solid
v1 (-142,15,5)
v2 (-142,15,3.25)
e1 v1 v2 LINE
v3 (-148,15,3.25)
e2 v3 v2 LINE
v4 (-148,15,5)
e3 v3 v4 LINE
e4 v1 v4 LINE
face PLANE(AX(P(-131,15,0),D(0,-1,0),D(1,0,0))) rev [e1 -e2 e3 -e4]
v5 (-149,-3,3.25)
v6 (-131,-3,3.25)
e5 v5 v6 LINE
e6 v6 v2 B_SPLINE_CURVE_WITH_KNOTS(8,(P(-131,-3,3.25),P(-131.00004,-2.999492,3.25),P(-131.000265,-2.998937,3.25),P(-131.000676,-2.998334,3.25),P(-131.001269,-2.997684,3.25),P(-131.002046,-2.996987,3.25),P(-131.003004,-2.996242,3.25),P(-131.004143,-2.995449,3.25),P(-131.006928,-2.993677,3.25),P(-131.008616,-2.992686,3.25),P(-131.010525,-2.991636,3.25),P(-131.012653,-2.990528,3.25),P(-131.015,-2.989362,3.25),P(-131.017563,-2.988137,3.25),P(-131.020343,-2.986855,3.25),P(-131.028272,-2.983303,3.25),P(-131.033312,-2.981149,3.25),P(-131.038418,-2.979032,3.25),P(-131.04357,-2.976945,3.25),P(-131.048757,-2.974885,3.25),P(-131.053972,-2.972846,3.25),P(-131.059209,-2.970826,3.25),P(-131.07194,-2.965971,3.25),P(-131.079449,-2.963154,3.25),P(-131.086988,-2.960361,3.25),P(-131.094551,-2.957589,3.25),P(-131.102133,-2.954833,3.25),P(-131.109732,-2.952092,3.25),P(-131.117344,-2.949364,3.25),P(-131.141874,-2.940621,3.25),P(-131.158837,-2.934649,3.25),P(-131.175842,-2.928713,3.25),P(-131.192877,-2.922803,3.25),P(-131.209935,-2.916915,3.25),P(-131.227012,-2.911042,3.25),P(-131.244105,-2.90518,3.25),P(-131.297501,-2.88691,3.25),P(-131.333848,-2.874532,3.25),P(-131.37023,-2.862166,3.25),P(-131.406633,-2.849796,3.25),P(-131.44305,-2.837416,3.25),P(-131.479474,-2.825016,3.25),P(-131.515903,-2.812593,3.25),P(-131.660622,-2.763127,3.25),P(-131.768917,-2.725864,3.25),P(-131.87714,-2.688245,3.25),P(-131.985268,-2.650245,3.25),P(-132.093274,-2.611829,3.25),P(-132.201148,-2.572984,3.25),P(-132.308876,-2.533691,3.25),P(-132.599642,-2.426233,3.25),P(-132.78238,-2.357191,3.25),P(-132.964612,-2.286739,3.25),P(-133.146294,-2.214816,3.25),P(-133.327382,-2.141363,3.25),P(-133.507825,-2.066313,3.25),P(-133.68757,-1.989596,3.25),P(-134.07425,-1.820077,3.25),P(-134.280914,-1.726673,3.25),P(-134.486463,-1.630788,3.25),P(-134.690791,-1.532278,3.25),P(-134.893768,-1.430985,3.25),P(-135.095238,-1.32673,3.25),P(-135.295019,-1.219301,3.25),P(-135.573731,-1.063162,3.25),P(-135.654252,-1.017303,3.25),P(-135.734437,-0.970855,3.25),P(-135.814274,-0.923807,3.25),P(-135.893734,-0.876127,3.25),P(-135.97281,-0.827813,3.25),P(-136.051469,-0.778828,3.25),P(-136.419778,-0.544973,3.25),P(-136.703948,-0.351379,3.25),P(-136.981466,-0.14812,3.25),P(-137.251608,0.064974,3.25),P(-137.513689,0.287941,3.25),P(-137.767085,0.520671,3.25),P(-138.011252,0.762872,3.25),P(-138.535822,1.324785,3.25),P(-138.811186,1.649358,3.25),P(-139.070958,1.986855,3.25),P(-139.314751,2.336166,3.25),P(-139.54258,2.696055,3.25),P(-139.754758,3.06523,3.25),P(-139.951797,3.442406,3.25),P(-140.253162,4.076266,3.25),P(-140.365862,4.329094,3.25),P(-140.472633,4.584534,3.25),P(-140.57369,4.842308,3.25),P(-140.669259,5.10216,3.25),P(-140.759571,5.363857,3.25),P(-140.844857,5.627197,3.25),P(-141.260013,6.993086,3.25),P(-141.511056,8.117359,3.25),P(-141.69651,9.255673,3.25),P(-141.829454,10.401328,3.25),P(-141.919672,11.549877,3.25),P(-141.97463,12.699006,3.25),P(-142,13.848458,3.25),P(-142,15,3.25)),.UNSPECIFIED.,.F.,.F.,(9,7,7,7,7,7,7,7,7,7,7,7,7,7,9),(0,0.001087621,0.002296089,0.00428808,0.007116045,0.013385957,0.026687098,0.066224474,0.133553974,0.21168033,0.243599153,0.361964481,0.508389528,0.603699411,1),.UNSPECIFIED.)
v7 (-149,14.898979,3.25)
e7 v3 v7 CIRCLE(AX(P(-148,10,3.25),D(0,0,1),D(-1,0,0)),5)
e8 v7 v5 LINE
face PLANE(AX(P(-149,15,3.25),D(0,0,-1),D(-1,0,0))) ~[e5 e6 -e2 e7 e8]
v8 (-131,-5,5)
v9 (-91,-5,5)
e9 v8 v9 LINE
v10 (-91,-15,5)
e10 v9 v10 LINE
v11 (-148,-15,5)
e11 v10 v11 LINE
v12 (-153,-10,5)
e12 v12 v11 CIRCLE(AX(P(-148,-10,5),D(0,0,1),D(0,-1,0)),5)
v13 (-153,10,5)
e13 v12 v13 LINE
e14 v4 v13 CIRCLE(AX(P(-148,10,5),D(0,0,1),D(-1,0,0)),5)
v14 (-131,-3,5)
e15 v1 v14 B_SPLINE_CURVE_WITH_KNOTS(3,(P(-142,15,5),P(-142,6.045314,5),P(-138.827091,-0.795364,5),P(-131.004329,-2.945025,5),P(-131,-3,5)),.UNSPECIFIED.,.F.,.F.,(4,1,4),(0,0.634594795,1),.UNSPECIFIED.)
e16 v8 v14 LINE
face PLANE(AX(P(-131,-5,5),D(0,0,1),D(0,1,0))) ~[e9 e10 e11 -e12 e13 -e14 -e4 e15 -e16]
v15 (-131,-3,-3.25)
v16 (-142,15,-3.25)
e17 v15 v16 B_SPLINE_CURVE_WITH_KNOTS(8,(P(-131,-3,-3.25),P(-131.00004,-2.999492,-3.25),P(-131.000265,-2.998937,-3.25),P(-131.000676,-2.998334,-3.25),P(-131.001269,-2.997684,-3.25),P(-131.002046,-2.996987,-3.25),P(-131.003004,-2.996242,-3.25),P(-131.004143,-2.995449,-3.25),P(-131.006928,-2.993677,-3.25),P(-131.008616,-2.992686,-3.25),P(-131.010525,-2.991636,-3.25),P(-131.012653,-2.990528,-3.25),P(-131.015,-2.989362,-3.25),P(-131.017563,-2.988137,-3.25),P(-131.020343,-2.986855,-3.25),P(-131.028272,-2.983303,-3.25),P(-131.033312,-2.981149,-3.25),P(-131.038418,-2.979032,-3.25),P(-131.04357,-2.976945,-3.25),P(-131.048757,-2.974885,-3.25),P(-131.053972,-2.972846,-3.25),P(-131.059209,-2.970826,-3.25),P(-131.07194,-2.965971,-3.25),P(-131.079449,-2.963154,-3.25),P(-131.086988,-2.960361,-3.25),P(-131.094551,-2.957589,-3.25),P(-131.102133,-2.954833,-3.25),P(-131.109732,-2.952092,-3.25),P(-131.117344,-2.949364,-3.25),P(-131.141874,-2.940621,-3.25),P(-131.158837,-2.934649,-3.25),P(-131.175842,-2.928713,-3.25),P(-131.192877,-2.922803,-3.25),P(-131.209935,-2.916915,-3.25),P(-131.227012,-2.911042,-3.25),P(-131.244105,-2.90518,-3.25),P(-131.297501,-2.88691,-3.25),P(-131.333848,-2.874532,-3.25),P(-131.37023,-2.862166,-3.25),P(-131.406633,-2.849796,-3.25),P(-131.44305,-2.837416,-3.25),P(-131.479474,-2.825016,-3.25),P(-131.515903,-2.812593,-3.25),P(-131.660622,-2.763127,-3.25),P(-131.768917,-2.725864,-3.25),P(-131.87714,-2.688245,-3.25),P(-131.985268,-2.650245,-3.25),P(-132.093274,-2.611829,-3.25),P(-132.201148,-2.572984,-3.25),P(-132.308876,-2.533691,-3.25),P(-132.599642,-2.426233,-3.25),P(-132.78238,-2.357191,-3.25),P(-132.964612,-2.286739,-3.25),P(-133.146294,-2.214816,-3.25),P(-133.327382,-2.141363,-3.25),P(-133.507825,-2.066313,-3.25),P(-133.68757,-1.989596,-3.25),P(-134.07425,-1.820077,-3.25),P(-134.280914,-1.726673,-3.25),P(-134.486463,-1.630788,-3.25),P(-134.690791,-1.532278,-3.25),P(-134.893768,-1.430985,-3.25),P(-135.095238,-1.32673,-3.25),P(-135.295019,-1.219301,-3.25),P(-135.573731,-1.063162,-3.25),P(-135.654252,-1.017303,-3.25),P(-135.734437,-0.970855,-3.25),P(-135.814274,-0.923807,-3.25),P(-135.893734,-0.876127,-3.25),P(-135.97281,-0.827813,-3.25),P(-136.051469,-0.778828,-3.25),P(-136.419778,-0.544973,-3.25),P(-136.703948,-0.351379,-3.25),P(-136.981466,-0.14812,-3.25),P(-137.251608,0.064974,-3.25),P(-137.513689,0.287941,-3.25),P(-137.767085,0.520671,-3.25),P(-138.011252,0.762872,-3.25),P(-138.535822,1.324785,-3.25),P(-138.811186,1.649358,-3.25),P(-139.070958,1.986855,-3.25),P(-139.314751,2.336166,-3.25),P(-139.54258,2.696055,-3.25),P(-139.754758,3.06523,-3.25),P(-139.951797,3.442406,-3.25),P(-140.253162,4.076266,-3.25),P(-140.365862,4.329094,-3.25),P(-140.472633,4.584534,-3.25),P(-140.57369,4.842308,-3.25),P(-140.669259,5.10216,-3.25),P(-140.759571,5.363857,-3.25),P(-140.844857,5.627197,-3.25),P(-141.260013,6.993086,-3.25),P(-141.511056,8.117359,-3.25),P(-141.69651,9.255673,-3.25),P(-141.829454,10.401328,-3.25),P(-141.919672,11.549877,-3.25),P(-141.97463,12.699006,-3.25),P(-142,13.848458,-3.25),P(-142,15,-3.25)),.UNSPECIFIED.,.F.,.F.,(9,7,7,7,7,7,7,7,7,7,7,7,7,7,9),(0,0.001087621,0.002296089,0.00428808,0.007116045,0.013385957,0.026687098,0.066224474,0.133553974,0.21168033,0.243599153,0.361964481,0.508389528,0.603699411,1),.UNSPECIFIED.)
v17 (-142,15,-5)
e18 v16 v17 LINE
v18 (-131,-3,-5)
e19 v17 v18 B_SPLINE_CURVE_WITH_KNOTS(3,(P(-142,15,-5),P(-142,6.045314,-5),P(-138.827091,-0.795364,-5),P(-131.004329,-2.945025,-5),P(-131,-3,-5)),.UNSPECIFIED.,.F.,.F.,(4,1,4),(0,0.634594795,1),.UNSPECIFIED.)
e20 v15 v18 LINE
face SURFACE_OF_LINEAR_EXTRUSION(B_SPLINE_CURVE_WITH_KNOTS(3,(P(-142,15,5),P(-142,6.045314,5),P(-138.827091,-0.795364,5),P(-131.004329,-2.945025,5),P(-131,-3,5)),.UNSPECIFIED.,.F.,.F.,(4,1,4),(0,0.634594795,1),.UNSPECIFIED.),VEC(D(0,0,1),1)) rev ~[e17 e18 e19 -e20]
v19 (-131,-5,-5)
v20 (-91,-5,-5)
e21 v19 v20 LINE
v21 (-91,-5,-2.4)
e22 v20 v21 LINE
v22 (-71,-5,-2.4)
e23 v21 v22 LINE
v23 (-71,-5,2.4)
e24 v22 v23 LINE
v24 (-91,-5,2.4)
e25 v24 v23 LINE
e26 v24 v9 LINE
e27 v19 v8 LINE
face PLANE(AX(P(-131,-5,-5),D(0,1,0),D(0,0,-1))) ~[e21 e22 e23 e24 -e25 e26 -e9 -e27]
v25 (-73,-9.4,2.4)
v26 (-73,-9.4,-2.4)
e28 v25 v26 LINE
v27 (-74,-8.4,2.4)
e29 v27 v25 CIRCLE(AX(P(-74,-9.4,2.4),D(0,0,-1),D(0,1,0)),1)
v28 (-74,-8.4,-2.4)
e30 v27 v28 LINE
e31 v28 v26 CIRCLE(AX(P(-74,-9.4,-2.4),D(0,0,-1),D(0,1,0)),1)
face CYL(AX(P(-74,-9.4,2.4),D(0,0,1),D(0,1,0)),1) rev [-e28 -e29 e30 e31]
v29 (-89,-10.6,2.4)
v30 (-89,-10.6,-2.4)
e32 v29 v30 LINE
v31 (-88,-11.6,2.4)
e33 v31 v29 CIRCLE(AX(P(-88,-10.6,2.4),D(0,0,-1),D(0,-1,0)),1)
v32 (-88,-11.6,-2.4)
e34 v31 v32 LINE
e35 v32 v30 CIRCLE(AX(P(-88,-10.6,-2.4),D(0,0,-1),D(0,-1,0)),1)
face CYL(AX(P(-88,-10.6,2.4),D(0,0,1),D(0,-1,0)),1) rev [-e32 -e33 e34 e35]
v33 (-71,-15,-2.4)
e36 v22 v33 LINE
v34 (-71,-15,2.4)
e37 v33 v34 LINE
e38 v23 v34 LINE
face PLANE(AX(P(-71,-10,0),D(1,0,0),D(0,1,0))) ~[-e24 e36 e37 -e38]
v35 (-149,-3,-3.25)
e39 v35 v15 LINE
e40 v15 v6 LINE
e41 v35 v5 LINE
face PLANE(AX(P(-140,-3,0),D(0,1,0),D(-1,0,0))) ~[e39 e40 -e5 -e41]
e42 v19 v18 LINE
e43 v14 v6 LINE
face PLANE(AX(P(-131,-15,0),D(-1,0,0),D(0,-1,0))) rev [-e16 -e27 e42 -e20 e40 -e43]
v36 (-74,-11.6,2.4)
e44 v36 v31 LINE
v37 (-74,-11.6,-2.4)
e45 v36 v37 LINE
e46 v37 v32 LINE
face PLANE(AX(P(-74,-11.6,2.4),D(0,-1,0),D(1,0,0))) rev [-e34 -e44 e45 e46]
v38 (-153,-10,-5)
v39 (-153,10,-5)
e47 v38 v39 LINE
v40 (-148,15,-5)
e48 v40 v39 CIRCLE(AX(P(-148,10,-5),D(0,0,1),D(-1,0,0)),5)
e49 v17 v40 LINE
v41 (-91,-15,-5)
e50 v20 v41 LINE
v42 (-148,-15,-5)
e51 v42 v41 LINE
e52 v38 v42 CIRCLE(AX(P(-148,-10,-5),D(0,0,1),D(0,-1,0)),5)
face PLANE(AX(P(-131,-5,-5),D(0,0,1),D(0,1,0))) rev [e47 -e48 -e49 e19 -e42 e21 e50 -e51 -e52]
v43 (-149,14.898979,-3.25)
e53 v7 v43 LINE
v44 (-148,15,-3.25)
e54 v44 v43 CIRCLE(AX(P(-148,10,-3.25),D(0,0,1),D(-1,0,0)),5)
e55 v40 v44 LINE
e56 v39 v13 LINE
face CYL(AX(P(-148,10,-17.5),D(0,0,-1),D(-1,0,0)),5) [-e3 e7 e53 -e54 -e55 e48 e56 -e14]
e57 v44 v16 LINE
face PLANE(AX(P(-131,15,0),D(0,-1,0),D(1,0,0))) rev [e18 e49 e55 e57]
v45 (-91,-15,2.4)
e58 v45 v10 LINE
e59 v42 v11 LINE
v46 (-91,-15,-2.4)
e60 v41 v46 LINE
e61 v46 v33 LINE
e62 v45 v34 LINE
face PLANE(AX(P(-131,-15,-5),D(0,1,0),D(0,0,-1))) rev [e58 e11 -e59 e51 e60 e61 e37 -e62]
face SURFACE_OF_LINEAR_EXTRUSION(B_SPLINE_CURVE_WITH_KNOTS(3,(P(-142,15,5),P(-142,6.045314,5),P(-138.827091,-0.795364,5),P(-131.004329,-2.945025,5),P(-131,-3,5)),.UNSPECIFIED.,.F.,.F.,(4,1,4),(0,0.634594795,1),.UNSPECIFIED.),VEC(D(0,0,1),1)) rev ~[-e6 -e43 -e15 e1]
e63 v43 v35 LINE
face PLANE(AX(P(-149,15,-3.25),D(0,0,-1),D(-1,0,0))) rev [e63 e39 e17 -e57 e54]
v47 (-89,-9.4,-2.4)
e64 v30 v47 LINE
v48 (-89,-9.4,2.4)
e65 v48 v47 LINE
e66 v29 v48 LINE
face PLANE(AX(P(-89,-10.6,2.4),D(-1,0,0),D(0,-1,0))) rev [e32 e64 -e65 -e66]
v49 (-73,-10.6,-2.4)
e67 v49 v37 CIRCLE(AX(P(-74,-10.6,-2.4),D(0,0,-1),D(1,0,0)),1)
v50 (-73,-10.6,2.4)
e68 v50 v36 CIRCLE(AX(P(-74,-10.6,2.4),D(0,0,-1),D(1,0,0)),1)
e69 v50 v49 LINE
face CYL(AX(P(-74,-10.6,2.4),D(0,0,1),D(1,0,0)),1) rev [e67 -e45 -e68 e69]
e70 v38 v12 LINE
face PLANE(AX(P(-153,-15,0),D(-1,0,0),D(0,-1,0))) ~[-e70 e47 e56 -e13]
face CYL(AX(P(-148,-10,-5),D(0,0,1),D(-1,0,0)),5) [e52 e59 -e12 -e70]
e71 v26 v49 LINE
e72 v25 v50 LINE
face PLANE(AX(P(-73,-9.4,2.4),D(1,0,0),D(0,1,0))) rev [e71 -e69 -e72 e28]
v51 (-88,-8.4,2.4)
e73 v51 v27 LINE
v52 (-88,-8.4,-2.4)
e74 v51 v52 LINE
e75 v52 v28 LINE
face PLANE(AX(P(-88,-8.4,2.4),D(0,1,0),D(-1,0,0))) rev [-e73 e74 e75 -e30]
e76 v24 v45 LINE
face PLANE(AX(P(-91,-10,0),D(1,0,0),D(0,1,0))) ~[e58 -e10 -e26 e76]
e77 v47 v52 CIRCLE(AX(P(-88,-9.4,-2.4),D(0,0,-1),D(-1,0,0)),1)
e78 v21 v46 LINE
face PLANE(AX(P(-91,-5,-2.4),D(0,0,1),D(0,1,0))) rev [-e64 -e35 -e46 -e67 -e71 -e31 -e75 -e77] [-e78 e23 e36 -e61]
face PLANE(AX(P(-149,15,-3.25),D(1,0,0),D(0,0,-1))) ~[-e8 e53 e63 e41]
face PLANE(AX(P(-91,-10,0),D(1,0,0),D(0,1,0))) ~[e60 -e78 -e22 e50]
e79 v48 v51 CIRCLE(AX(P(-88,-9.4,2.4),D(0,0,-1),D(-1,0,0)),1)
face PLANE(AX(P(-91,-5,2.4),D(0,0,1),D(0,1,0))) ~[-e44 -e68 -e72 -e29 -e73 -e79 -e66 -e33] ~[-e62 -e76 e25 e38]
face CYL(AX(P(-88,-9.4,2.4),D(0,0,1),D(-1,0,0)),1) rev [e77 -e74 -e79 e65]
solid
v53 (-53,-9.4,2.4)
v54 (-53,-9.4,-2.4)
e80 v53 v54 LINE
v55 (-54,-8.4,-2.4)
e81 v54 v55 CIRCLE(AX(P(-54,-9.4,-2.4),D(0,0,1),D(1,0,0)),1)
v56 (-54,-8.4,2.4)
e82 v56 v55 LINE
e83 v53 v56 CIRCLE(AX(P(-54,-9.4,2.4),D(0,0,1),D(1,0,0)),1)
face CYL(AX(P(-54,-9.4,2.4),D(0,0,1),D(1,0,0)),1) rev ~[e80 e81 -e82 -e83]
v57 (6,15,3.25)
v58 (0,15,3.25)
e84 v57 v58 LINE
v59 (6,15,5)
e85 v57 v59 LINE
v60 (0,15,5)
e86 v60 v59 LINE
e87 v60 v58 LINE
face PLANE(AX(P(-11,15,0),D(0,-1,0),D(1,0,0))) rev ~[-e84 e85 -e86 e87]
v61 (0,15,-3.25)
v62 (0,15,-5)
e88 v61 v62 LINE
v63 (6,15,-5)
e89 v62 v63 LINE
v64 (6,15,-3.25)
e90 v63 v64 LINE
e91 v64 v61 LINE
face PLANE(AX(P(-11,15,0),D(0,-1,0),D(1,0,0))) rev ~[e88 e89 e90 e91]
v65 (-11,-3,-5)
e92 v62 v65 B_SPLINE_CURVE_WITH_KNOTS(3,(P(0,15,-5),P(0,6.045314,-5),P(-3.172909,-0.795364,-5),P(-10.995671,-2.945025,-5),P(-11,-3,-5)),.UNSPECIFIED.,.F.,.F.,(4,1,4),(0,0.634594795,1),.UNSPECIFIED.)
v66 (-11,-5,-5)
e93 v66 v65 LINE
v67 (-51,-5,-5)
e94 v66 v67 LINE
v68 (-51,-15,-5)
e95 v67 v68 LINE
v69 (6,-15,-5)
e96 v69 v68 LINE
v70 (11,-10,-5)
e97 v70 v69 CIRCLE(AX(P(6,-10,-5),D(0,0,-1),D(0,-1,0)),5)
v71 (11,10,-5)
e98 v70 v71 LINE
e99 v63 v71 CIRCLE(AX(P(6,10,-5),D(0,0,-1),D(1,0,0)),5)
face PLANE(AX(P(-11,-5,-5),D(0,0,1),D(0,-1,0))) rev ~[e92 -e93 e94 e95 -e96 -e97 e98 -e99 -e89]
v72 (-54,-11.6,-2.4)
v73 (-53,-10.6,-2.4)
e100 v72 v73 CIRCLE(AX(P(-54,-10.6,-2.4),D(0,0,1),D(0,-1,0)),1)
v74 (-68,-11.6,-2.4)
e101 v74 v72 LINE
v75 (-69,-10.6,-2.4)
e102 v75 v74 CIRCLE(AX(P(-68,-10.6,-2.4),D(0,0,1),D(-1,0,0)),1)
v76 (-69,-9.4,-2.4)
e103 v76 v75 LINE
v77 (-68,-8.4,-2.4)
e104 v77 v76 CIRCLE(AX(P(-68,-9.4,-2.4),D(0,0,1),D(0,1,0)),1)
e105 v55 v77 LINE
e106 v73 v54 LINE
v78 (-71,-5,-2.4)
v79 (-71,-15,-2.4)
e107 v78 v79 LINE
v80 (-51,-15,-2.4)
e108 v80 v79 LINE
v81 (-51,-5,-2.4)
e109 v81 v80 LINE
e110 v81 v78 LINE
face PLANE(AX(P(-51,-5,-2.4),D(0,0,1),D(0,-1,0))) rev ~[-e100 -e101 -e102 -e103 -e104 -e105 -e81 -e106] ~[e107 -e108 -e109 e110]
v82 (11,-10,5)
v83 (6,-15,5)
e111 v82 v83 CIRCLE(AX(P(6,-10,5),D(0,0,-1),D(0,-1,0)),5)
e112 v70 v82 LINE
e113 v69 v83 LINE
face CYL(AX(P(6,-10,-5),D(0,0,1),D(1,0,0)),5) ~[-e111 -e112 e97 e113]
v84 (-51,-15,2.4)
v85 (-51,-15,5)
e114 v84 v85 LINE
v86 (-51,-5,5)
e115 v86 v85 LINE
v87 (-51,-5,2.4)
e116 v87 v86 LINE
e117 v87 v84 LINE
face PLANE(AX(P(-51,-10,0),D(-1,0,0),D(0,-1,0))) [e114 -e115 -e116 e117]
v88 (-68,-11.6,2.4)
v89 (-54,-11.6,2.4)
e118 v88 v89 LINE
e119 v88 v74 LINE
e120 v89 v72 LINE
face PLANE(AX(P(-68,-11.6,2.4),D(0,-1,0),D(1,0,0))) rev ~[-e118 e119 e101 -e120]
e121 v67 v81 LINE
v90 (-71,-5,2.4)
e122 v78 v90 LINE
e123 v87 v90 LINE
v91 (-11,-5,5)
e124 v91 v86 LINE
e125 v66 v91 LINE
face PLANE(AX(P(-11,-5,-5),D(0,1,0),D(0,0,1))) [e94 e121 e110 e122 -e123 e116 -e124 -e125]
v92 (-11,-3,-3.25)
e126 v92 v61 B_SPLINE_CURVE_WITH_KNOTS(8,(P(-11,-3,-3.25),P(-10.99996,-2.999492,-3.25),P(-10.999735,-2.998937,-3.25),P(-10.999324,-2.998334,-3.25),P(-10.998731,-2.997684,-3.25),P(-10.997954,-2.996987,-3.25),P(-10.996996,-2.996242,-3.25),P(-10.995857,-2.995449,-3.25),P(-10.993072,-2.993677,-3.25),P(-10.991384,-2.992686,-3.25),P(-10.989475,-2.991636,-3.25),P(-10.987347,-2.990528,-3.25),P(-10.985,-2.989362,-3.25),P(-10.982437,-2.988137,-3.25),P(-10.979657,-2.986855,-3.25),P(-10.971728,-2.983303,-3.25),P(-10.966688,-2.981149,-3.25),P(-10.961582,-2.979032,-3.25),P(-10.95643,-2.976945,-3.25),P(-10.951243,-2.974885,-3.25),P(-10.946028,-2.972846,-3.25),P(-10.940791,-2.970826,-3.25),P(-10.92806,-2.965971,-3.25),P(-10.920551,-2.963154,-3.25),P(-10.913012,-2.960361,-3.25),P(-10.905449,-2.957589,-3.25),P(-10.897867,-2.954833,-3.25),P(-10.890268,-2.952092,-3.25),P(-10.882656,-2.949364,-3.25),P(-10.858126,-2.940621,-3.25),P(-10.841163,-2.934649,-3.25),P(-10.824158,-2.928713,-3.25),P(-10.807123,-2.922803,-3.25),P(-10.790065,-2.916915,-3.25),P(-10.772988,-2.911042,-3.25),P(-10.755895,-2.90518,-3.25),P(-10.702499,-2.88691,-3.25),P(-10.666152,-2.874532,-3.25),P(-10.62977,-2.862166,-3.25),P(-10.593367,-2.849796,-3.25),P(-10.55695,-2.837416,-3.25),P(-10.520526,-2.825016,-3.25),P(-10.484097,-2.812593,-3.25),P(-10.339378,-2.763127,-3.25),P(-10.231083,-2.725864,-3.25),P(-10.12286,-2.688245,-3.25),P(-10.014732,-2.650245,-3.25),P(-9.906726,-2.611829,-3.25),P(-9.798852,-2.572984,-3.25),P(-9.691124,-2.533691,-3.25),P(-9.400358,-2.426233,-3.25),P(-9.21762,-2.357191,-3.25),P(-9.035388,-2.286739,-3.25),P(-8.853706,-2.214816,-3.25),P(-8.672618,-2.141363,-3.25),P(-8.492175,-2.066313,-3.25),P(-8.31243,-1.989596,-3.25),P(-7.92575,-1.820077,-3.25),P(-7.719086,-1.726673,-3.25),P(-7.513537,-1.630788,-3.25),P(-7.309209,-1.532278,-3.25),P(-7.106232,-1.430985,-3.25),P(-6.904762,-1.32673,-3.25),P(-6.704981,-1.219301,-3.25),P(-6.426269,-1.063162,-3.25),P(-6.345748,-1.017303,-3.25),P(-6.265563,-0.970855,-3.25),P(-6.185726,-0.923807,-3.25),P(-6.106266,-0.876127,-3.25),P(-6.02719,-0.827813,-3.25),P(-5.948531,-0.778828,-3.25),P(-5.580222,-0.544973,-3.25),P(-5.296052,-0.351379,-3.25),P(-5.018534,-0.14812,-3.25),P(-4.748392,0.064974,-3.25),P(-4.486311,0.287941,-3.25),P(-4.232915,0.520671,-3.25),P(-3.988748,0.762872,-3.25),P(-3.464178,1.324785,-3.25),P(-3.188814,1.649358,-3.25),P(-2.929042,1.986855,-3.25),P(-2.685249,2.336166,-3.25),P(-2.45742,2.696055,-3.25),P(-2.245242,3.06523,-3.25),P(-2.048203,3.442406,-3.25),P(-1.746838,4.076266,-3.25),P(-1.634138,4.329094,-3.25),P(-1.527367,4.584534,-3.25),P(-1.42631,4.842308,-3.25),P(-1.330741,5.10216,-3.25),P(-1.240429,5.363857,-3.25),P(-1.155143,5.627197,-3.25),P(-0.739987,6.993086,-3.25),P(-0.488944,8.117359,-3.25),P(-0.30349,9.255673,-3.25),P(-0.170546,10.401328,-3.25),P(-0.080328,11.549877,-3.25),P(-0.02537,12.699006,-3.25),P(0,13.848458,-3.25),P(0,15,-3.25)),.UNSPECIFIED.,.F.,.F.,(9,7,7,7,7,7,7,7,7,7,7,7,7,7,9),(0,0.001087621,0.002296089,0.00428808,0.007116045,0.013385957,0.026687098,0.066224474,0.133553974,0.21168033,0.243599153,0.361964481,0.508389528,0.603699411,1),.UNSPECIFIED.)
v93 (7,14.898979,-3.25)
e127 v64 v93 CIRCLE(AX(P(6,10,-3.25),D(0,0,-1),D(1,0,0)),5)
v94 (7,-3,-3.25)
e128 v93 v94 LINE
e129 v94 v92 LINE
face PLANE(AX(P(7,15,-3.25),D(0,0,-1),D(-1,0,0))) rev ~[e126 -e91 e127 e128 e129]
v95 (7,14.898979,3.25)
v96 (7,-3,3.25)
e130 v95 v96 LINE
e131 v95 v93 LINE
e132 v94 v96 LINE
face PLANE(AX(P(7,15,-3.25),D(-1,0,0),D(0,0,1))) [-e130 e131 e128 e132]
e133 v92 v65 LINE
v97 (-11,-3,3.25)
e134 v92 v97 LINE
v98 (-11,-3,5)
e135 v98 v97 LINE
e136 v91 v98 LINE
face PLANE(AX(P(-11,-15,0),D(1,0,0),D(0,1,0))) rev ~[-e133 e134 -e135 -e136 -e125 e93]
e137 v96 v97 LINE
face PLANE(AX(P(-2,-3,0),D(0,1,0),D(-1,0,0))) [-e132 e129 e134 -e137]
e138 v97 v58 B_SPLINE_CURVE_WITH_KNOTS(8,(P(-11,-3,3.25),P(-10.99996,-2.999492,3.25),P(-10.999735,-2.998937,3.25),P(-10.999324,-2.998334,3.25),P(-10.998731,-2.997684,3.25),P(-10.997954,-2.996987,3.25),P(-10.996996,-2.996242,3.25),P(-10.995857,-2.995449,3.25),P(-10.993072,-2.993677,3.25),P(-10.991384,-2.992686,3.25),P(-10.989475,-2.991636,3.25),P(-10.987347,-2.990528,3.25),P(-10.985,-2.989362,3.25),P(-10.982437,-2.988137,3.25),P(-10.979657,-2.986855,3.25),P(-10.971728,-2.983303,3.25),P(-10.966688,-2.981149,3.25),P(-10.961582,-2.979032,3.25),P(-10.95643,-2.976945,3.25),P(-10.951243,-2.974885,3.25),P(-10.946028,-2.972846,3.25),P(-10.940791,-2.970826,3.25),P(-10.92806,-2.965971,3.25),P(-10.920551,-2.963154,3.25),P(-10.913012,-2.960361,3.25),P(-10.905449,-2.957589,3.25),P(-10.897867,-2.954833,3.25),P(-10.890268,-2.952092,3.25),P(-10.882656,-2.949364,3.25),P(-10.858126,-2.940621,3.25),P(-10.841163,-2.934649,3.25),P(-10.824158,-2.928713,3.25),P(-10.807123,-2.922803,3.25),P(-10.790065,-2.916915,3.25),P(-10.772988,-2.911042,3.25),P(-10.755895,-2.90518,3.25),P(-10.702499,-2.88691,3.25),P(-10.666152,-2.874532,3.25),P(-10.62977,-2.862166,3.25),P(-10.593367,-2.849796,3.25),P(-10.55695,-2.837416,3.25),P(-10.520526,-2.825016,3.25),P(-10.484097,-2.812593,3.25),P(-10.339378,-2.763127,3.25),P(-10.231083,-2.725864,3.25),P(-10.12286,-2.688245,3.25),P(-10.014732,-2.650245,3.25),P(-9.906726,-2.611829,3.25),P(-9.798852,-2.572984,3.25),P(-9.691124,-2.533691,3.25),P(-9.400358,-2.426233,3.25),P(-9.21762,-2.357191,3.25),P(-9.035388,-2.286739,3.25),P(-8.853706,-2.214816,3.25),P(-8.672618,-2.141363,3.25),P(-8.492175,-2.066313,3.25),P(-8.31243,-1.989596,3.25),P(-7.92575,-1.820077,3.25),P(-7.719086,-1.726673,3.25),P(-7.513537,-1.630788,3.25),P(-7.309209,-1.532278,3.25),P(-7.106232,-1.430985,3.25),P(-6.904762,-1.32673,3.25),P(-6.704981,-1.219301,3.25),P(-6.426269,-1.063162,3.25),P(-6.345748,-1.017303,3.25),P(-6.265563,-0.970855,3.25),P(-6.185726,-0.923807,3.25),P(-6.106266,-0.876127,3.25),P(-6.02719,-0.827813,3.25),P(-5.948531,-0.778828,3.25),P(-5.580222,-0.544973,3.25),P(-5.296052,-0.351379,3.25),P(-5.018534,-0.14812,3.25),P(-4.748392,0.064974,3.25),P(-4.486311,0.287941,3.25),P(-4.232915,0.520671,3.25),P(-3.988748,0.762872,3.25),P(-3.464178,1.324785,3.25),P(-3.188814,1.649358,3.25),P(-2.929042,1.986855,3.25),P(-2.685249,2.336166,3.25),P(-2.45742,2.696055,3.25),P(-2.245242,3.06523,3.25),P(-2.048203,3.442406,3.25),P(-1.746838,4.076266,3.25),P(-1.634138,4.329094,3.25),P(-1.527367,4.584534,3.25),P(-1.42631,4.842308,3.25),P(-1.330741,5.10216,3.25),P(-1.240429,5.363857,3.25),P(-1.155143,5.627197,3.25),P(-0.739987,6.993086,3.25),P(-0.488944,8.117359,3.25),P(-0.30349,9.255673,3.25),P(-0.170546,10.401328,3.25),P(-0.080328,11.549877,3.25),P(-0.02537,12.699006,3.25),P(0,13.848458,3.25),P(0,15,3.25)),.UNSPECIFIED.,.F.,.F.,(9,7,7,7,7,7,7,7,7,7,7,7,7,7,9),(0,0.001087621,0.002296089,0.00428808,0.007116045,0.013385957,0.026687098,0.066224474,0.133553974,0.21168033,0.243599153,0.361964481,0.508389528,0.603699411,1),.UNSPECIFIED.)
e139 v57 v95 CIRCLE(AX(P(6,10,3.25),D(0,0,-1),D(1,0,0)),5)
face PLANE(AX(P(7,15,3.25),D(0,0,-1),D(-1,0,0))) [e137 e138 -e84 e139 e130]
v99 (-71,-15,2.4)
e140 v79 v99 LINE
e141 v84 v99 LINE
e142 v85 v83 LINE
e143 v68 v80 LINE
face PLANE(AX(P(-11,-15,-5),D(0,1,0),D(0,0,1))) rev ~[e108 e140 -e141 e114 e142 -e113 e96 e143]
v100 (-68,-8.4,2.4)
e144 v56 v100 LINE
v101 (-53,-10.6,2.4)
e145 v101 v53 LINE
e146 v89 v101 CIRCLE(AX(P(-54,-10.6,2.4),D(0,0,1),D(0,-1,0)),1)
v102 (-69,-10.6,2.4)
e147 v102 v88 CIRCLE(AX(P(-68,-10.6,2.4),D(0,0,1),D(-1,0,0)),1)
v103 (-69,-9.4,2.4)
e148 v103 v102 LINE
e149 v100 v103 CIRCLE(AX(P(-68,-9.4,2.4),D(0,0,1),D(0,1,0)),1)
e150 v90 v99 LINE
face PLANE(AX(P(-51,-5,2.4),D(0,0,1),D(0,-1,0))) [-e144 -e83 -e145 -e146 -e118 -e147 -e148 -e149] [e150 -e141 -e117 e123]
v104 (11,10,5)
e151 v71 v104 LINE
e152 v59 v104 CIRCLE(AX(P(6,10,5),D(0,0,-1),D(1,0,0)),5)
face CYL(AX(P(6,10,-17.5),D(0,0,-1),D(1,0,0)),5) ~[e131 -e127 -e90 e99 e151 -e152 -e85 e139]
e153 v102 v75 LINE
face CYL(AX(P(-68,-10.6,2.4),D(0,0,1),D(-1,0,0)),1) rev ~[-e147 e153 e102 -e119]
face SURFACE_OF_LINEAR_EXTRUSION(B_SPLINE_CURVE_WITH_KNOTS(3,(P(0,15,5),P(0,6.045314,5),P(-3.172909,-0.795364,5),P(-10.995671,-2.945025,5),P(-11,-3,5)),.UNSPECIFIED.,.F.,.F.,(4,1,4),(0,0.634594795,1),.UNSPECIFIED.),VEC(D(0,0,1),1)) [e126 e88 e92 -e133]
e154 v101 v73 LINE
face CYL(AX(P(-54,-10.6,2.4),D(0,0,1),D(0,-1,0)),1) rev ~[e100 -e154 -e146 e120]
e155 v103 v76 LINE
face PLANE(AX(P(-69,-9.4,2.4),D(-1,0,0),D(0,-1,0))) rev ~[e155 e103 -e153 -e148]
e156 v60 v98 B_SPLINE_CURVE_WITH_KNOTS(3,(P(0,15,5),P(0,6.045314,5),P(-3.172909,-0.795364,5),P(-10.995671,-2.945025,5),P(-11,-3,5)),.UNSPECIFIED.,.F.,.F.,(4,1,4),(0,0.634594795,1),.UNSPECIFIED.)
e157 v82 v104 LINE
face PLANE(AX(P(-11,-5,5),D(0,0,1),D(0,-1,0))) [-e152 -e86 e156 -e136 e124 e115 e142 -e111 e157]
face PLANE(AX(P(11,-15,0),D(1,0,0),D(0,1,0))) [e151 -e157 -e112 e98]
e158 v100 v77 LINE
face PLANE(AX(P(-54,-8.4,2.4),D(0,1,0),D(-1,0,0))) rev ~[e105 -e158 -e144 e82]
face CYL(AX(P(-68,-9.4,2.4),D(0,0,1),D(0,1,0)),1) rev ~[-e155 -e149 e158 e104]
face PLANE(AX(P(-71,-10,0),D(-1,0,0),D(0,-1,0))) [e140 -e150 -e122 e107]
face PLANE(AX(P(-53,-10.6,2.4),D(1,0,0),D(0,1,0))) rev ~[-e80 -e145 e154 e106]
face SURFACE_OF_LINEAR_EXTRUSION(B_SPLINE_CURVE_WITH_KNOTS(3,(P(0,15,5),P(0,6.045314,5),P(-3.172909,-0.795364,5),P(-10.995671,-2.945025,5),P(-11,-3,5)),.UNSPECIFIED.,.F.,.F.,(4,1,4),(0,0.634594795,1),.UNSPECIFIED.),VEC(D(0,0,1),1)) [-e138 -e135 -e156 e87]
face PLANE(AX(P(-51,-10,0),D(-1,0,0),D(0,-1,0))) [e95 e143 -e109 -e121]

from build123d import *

# Parameters (mm, degrees)
F0_W         = 22
F0_H         = 30
F1_DEPTH     = 5
F2_W         = 18
F2_H         = 6.5
F3_DEPTH     = 18
F4_W         = 10
F4_H         = 10
F5_DEPTH     = 40
F6_W         = 10
F6_H         = 4.8
F7_DEPTH     = 20
F9_DEPTH     = 4.8
F11_DEPTH    = 10
F12_R        = 5
F13_T1_DEPTH = 35


# Not quite as in the source:
# - a fillet or chamfer that OpenCascade refuses, or shapes differently, is made with other operations: its cross-section is extruded or revolved along the edge and cut away or added


with BuildPart() as f1:
    # F0 (on Top) → F1 (new body, symmetric)
    with BuildSketch(Plane.XY):
        Rectangle(F0_W, F0_H)
    extrude(amount=F1_DEPTH, both=True)

    # F2 (on face) → F3 (cut)
    with BuildSketch(Plane(origin=(0, 15, 0), x_dir=(-1, 0, 0), z_dir=(0, 1, 0))):
        with Locations((2, 0)):
            Rectangle(F2_W, F2_H)
    extrude(amount=-F3_DEPTH, mode=Mode.SUBTRACT)

    # F4 (on face) → F5 (join)
    with BuildSketch(Plane(origin=(-11, 0, 0), x_dir=(0, -1, 0), z_dir=(-1, 0, 0))):
        with Locations((10, 0)):
            Rectangle(F4_W, F4_H)
    extrude(amount=F5_DEPTH)

    # F6 (on face) → F7 (join)
    with BuildSketch(Plane(origin=(-51, 0, 0), x_dir=(0, -1, 0), z_dir=(-1, 0, 0))):
        with Locations((10, 0)):
            Rectangle(F6_W, F6_H)
    extrude(amount=F7_DEPTH)

    # F8 (on face) → F9 (cut, through all)
    with BuildSketch(Plane.XY.offset(2.4)):
        with BuildLine():
            Line((-54, -8.4), (-68, -8.4))
            ThreePointArc((-68, -8.4), (-68.7071067812, -8.6928932188), (-69, -9.4))
            Line((-69, -9.4), (-69, -10.6))
            ThreePointArc((-69, -10.6), (-68.7071067812, -11.3071067812), (-68, -11.6))
            Line((-68, -11.6), (-54, -11.6))
            ThreePointArc((-54, -11.6), (-53.2928932188, -11.3071067812), (-53, -10.6))
            Line((-53, -10.6), (-53, -9.4))
            ThreePointArc((-53, -9.4), (-53.2928932188, -8.6928932188), (-54, -8.4))
        make_face()
    extrude(amount=-F9_DEPTH, mode=Mode.SUBTRACT)

    # F10 (on face) → F11 (cut, through all)
    with BuildSketch(Plane.XY.offset(5)):
        with BuildLine():
            add(Edge.make_bspline(
                [(0, 15), (0, 6.0453137533), (-3.1729094877, -0.7953640379), (-10.9956707869, -2.9450245736), (-11, -3)],
                knots=[0, 0, 0, 0, 0.6345947949, 1, 1, 1, 1], degree=3))
            Line((0, 15), (-11, 15))
            Line((-11, 15), (-11, -3))
        make_face()
    extrude(amount=-F11_DEPTH, mode=Mode.SUBTRACT)

    # F12
    f12_edges = [f1.edges().sort_by_distance(p)[0] for p in [
        (11, -15, 0),
    ]]
    fillet(f12_edges, radius=F12_R)

    # F13: fillet of radius 5 on 1 edges, made by hand

    # F13_s2 → F13_t1 (cut)
    with BuildSketch(Plane.XY.offset(-17.5)):
        with BuildLine():
            ThreePointArc((11, 10), (9.5355339059, 13.5355339059), (6, 15))
            Line((6, 15), (11, 15))
            Line((11, 15), (11, 10))
        make_face()
    extrude(amount=F13_T1_DEPTH, mode=Mode.SUBTRACT)


with BuildPart() as f14_1:
    # F14: instance of F1
    add(f1.part.mirror(Plane(origin=(-71, -10, 0), x_dir=(0, -1, 0), z_dir=(-1, 0, 0))))


solid = Compound([f1.part, f14_1.part])
